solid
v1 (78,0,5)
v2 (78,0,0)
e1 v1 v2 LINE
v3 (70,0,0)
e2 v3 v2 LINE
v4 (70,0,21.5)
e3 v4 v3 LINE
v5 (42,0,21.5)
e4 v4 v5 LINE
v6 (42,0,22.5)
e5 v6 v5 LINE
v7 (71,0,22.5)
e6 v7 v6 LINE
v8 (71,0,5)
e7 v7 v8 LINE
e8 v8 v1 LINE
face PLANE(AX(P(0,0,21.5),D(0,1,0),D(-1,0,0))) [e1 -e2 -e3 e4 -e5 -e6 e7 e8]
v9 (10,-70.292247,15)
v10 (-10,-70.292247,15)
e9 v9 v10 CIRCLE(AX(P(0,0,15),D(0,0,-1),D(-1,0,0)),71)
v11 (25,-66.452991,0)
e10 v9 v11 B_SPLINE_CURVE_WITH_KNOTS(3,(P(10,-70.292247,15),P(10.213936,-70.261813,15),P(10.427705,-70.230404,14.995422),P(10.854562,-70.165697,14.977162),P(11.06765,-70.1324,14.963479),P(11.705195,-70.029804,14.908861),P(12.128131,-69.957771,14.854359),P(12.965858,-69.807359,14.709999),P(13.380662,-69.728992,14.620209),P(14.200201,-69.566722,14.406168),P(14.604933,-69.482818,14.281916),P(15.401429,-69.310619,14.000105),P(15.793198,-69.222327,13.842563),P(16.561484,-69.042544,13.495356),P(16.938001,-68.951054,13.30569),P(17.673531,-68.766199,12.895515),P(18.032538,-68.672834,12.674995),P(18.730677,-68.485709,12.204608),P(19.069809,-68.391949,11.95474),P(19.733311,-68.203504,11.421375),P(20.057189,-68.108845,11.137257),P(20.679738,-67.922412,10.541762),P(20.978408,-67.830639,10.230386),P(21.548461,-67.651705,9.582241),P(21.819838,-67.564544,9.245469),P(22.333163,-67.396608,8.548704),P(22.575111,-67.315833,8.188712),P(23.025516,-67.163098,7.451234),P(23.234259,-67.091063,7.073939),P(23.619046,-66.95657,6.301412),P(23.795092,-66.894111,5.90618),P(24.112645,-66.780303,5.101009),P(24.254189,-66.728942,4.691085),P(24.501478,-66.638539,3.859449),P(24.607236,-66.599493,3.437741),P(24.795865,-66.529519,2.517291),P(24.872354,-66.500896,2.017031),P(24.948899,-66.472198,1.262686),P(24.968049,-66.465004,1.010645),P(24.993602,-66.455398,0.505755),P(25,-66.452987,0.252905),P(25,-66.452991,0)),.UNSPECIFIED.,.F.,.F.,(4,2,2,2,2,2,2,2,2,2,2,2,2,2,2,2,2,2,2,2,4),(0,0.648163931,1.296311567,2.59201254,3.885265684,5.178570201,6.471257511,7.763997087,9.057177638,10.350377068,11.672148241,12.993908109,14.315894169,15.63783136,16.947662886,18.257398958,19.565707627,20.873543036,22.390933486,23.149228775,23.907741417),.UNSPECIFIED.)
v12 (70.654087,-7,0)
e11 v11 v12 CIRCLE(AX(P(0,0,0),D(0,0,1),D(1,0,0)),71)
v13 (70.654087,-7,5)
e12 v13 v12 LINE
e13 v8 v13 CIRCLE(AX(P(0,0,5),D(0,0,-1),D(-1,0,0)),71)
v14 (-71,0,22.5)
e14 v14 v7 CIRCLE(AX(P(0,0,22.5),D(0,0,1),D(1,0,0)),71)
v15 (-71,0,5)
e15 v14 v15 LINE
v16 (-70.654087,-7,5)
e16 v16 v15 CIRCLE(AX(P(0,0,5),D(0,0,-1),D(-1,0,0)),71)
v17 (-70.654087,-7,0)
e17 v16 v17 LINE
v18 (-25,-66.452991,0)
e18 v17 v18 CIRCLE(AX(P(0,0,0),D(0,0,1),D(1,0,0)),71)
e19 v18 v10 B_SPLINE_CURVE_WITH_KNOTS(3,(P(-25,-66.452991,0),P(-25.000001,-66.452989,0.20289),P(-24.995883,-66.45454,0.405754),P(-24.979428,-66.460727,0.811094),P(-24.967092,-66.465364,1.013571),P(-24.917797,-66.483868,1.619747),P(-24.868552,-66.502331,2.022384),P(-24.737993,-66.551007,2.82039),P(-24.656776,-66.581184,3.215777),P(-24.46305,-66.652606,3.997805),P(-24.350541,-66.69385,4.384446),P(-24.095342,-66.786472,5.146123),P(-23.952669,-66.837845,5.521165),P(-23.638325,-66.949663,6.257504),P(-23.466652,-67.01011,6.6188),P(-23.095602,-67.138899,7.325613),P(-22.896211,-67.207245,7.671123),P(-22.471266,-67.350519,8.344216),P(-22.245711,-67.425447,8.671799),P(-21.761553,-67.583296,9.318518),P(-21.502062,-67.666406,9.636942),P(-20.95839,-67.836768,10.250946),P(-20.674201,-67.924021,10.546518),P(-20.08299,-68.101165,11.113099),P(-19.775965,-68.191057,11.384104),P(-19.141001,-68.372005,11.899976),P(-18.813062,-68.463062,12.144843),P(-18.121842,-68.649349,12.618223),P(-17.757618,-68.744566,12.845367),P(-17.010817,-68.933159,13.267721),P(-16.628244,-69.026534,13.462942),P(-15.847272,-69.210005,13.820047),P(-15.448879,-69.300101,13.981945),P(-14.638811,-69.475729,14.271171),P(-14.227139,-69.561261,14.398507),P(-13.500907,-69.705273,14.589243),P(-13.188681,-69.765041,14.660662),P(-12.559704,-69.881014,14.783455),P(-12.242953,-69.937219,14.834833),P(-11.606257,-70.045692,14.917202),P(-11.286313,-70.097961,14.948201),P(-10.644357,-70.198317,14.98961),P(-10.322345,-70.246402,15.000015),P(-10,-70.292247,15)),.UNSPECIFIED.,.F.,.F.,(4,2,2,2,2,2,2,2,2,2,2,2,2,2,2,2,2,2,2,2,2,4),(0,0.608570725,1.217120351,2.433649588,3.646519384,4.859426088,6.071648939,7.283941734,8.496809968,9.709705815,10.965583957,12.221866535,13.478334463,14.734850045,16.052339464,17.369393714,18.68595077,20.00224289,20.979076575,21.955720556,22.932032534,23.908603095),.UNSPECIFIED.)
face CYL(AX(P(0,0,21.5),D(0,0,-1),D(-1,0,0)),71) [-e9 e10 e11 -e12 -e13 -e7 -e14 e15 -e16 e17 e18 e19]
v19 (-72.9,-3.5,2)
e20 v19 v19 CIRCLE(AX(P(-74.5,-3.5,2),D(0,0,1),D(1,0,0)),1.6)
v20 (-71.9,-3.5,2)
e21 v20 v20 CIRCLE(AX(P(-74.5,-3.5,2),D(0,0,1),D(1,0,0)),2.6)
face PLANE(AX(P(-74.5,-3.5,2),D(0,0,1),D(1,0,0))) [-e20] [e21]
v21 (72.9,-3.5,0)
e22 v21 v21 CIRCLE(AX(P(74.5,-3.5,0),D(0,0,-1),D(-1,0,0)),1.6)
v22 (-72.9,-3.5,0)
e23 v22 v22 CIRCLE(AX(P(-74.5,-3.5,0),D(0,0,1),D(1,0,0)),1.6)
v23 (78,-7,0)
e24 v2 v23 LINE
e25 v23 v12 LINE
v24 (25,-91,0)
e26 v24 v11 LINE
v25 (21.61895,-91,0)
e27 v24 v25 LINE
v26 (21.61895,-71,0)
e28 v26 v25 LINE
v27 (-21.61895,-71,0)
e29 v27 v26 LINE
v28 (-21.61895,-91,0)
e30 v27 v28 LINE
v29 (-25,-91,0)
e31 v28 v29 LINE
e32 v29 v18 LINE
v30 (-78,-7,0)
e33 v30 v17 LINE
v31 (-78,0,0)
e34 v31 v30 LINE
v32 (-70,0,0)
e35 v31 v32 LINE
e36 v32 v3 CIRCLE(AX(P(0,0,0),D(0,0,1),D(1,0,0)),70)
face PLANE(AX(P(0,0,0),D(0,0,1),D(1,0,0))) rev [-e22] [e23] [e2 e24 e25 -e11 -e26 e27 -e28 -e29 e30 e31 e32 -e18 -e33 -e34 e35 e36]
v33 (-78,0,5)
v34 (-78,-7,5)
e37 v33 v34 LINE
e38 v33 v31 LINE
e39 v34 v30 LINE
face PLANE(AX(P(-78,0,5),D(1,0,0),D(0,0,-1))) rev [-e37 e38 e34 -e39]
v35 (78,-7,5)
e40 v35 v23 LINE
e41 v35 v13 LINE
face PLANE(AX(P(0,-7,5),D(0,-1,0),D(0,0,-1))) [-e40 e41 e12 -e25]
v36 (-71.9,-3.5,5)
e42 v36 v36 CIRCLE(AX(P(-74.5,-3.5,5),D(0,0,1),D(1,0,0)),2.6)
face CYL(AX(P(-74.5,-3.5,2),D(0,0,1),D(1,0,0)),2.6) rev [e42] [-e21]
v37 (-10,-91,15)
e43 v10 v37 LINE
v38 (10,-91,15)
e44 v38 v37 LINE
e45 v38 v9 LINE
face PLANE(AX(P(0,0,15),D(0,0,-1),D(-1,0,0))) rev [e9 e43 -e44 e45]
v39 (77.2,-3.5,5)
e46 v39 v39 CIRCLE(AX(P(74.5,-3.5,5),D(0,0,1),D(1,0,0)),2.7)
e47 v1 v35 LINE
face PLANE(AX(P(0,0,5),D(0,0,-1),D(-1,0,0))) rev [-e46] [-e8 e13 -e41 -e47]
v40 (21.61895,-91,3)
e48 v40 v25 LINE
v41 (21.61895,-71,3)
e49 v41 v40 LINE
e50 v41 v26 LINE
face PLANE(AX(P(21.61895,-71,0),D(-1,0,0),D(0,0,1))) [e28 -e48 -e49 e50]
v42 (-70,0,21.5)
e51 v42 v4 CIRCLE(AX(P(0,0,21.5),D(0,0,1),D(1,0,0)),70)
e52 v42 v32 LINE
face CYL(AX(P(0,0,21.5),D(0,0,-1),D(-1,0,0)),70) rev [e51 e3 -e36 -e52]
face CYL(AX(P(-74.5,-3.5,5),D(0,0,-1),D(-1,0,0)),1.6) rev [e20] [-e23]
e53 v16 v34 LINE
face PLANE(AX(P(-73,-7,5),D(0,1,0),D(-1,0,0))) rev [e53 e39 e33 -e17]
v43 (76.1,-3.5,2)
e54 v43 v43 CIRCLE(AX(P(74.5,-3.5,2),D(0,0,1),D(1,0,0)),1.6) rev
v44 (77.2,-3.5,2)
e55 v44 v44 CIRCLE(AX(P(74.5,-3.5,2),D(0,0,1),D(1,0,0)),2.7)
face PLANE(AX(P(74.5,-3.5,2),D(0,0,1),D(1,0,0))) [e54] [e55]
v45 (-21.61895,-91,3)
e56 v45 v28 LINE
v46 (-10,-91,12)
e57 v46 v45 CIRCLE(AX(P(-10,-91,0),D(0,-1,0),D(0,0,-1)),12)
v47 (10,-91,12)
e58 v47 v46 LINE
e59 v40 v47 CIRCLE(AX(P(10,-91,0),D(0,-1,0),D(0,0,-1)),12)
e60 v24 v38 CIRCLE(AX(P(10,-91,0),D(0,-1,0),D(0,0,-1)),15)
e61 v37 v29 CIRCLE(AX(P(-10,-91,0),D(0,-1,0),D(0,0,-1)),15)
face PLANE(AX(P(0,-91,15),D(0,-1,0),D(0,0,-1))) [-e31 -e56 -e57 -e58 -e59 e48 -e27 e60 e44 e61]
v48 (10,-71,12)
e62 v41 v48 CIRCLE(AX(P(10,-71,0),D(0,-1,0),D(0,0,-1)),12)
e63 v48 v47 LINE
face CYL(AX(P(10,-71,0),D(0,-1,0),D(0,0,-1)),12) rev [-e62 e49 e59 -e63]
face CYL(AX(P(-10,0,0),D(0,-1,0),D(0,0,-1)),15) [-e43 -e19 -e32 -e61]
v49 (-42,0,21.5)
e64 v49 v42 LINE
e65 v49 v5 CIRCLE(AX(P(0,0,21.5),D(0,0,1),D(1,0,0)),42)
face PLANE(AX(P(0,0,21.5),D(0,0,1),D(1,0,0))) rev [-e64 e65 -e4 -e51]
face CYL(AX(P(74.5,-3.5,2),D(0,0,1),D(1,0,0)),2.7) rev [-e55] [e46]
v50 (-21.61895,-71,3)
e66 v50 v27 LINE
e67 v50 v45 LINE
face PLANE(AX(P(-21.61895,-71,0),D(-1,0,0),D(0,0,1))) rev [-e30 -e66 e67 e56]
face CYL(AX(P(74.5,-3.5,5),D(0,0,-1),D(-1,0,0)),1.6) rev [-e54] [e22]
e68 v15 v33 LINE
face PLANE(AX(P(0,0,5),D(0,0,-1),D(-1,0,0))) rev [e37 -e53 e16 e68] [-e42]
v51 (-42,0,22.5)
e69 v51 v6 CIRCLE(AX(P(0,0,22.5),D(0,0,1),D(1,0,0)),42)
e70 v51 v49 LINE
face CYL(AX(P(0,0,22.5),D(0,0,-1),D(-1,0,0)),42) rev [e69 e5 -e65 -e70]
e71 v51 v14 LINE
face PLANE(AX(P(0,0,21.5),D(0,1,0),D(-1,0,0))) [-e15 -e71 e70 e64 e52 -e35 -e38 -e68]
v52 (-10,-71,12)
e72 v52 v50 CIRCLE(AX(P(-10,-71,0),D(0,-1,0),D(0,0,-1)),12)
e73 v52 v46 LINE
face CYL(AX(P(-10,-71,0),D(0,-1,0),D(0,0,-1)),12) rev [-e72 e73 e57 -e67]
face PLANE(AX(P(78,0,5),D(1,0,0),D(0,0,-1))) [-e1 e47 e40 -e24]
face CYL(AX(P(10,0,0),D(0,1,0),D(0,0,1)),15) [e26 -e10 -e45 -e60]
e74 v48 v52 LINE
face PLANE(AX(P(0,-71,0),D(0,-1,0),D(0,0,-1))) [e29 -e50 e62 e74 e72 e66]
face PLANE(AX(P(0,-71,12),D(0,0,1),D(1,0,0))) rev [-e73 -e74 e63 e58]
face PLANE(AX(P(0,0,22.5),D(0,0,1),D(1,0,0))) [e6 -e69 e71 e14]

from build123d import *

# Parameters (mm, degrees)
BOSS_EXTRUDE1_DEPTH = 21.5
BOSS_EXTRUDE2_DEPTH = 1
SKETCH3_W           = 50
SKETCH3_H           = 20
BOSS_EXTRUDE3_DEPTH = 15
SKETCH8_R           = 1.6
BOSS_EXTRUDE5_DEPTH = 5
SKETCH10_R          = 2.7
SKETCH10_R_2        = 2.6
CUT_EXTRUDE5_DEPTH  = 3
FILLET2_R           = 15
SKETCH11_W          = 43.237900078
SKETCH11_H          = 3
CUT_EXTRUDE7_DEPTH  = 20


with BuildPart() as part:
    # Sketch1 → Boss-Extrude1 (new body)
    with BuildSketch(Plane.XY):
        with BuildLine():
            Line((71, 0), (70, 0))
            ThreePointArc((70, 0), (0, -70), (-70, 0))
            Line((-70, 0), (-71, 0))
            ThreePointArc((-71, 0), (0, -71), (71, 0))
        make_face()
    extrude(amount=BOSS_EXTRUDE1_DEPTH)

    # Sketch2 → Boss-Extrude2 (add)
    with BuildSketch(Plane.XY.offset(21.5)):
        with BuildLine():
            Line((71, 0), (70, 0))
            ThreePointArc((70, 0), (0, -70), (-70, 0))
            Line((-70, 0), (-71, 0))
            ThreePointArc((-71, 0), (0, -71), (71, 0))
        make_face()
        with BuildLine():
            Line((-42, 0), (-70, 0))
            ThreePointArc((-70, 0), (0, -70), (70, 0))
            Line((70, 0), (42, 0))
            ThreePointArc((42, 0), (0, -42), (-42, 0))
        make_face()
    extrude(amount=BOSS_EXTRUDE2_DEPTH)

    # Sketch3 → Boss-Extrude3 (add)
    with BuildSketch(Plane(origin=(0, 0, 0), x_dir=(-1, 0, 0), z_dir=(0, 0, -1))):
        with BuildLine():
            Line((-25, -66.452990903), (-25, -71))
            Line((-25, -71), (0, -71))
            ThreePointArc((0, -71), (-12.705070757, -69.853999006), (-25, -66.452990903))
        make_face()
        with BuildLine():
            ThreePointArc((25, -66.452990903), (12.705070757, -69.853999006), (0, -71))
            Line((0, -71), (25, -71))
            Line((25, -71), (25, -66.452990903))
        make_face()
        with Locations((0, -81)):
            Rectangle(SKETCH3_W, SKETCH3_H)
    extrude(amount=-BOSS_EXTRUDE3_DEPTH)

    # Sketch8 → Boss-Extrude5 (add)
    # profile 1 of 2: a face of its own
    with BuildSketch(Plane(origin=(0, 0, 0), x_dir=(-1, 0, 0), z_dir=(0, 0, -1))):
        with BuildLine():
            ThreePointArc((-70.654086931, -7), (-70.913469003, -3.504270818), (-71, 0))
            Line((-71, 0), (-78, 0))
            Line((-78, 0), (-78, -7))
            Line((-78, -7), (-70.654086931, -7))
        make_face()
        with Locations((-74.5, -3.5)):
            Circle(SKETCH8_R, mode=Mode.SUBTRACT)
    # profile 2 of 2: a face of its own
    with BuildSketch(Plane(origin=(0, 0, 0), x_dir=(-1, 0, 0), z_dir=(0, 0, -1))):
        with BuildLine():
            Line((78, 0), (71, 0))
            ThreePointArc((71, 0), (70.913469003, -3.504270818), (70.654086931, -7))
            Line((70.654086931, -7), (78, -7))
            Line((78, -7), (78, 0))
        make_face()
        with Locations(Location((74.5, -3.5, 0), (0, 0, 180))):
            Circle(SKETCH8_R, mode=Mode.SUBTRACT)
    extrude(amount=-BOSS_EXTRUDE5_DEPTH)

    # Sketch10 → Cut-Extrude5 (cut)
    with BuildSketch(Plane.XY.offset(5)):
        with Locations((74.5, -3.5)):
            Circle(SKETCH10_R)
        with Locations((-74.5, -3.5)):
            Circle(SKETCH10_R_2)
    extrude(amount=-CUT_EXTRUDE5_DEPTH, mode=Mode.SUBTRACT)

    # Fillet2
    fillet2_edges = [part.edges().sort_by_distance(p)[0] for p in [
        (-25, -78.726495452, 15),
        (25, -78.726495452, 15),
    ]]
    fillet(fillet2_edges, radius=FILLET2_R - 0.0001)  # a hair under: the kernel refuses the full size

    # Sketch11 → Cut-Extrude7 (cut)
    with BuildSketch(Plane.XZ.offset(91)):
        with Locations((0, 1.5)):
            Rectangle(SKETCH11_W, SKETCH11_H)
        with BuildLine():
            Line((-21.618950039, 3), (21.618950039, 3))
            ThreePointArc((21.618950039, 3), (17.348469228, 9.486832981), (10, 12))
            Line((10, 12), (-10, 12))
            ThreePointArc((-10, 12), (-17.348469228, 9.486832981), (-21.618950039, 3))
        make_face()
    extrude(amount=-CUT_EXTRUDE7_DEPTH, mode=Mode.SUBTRACT)


solid = part.part
